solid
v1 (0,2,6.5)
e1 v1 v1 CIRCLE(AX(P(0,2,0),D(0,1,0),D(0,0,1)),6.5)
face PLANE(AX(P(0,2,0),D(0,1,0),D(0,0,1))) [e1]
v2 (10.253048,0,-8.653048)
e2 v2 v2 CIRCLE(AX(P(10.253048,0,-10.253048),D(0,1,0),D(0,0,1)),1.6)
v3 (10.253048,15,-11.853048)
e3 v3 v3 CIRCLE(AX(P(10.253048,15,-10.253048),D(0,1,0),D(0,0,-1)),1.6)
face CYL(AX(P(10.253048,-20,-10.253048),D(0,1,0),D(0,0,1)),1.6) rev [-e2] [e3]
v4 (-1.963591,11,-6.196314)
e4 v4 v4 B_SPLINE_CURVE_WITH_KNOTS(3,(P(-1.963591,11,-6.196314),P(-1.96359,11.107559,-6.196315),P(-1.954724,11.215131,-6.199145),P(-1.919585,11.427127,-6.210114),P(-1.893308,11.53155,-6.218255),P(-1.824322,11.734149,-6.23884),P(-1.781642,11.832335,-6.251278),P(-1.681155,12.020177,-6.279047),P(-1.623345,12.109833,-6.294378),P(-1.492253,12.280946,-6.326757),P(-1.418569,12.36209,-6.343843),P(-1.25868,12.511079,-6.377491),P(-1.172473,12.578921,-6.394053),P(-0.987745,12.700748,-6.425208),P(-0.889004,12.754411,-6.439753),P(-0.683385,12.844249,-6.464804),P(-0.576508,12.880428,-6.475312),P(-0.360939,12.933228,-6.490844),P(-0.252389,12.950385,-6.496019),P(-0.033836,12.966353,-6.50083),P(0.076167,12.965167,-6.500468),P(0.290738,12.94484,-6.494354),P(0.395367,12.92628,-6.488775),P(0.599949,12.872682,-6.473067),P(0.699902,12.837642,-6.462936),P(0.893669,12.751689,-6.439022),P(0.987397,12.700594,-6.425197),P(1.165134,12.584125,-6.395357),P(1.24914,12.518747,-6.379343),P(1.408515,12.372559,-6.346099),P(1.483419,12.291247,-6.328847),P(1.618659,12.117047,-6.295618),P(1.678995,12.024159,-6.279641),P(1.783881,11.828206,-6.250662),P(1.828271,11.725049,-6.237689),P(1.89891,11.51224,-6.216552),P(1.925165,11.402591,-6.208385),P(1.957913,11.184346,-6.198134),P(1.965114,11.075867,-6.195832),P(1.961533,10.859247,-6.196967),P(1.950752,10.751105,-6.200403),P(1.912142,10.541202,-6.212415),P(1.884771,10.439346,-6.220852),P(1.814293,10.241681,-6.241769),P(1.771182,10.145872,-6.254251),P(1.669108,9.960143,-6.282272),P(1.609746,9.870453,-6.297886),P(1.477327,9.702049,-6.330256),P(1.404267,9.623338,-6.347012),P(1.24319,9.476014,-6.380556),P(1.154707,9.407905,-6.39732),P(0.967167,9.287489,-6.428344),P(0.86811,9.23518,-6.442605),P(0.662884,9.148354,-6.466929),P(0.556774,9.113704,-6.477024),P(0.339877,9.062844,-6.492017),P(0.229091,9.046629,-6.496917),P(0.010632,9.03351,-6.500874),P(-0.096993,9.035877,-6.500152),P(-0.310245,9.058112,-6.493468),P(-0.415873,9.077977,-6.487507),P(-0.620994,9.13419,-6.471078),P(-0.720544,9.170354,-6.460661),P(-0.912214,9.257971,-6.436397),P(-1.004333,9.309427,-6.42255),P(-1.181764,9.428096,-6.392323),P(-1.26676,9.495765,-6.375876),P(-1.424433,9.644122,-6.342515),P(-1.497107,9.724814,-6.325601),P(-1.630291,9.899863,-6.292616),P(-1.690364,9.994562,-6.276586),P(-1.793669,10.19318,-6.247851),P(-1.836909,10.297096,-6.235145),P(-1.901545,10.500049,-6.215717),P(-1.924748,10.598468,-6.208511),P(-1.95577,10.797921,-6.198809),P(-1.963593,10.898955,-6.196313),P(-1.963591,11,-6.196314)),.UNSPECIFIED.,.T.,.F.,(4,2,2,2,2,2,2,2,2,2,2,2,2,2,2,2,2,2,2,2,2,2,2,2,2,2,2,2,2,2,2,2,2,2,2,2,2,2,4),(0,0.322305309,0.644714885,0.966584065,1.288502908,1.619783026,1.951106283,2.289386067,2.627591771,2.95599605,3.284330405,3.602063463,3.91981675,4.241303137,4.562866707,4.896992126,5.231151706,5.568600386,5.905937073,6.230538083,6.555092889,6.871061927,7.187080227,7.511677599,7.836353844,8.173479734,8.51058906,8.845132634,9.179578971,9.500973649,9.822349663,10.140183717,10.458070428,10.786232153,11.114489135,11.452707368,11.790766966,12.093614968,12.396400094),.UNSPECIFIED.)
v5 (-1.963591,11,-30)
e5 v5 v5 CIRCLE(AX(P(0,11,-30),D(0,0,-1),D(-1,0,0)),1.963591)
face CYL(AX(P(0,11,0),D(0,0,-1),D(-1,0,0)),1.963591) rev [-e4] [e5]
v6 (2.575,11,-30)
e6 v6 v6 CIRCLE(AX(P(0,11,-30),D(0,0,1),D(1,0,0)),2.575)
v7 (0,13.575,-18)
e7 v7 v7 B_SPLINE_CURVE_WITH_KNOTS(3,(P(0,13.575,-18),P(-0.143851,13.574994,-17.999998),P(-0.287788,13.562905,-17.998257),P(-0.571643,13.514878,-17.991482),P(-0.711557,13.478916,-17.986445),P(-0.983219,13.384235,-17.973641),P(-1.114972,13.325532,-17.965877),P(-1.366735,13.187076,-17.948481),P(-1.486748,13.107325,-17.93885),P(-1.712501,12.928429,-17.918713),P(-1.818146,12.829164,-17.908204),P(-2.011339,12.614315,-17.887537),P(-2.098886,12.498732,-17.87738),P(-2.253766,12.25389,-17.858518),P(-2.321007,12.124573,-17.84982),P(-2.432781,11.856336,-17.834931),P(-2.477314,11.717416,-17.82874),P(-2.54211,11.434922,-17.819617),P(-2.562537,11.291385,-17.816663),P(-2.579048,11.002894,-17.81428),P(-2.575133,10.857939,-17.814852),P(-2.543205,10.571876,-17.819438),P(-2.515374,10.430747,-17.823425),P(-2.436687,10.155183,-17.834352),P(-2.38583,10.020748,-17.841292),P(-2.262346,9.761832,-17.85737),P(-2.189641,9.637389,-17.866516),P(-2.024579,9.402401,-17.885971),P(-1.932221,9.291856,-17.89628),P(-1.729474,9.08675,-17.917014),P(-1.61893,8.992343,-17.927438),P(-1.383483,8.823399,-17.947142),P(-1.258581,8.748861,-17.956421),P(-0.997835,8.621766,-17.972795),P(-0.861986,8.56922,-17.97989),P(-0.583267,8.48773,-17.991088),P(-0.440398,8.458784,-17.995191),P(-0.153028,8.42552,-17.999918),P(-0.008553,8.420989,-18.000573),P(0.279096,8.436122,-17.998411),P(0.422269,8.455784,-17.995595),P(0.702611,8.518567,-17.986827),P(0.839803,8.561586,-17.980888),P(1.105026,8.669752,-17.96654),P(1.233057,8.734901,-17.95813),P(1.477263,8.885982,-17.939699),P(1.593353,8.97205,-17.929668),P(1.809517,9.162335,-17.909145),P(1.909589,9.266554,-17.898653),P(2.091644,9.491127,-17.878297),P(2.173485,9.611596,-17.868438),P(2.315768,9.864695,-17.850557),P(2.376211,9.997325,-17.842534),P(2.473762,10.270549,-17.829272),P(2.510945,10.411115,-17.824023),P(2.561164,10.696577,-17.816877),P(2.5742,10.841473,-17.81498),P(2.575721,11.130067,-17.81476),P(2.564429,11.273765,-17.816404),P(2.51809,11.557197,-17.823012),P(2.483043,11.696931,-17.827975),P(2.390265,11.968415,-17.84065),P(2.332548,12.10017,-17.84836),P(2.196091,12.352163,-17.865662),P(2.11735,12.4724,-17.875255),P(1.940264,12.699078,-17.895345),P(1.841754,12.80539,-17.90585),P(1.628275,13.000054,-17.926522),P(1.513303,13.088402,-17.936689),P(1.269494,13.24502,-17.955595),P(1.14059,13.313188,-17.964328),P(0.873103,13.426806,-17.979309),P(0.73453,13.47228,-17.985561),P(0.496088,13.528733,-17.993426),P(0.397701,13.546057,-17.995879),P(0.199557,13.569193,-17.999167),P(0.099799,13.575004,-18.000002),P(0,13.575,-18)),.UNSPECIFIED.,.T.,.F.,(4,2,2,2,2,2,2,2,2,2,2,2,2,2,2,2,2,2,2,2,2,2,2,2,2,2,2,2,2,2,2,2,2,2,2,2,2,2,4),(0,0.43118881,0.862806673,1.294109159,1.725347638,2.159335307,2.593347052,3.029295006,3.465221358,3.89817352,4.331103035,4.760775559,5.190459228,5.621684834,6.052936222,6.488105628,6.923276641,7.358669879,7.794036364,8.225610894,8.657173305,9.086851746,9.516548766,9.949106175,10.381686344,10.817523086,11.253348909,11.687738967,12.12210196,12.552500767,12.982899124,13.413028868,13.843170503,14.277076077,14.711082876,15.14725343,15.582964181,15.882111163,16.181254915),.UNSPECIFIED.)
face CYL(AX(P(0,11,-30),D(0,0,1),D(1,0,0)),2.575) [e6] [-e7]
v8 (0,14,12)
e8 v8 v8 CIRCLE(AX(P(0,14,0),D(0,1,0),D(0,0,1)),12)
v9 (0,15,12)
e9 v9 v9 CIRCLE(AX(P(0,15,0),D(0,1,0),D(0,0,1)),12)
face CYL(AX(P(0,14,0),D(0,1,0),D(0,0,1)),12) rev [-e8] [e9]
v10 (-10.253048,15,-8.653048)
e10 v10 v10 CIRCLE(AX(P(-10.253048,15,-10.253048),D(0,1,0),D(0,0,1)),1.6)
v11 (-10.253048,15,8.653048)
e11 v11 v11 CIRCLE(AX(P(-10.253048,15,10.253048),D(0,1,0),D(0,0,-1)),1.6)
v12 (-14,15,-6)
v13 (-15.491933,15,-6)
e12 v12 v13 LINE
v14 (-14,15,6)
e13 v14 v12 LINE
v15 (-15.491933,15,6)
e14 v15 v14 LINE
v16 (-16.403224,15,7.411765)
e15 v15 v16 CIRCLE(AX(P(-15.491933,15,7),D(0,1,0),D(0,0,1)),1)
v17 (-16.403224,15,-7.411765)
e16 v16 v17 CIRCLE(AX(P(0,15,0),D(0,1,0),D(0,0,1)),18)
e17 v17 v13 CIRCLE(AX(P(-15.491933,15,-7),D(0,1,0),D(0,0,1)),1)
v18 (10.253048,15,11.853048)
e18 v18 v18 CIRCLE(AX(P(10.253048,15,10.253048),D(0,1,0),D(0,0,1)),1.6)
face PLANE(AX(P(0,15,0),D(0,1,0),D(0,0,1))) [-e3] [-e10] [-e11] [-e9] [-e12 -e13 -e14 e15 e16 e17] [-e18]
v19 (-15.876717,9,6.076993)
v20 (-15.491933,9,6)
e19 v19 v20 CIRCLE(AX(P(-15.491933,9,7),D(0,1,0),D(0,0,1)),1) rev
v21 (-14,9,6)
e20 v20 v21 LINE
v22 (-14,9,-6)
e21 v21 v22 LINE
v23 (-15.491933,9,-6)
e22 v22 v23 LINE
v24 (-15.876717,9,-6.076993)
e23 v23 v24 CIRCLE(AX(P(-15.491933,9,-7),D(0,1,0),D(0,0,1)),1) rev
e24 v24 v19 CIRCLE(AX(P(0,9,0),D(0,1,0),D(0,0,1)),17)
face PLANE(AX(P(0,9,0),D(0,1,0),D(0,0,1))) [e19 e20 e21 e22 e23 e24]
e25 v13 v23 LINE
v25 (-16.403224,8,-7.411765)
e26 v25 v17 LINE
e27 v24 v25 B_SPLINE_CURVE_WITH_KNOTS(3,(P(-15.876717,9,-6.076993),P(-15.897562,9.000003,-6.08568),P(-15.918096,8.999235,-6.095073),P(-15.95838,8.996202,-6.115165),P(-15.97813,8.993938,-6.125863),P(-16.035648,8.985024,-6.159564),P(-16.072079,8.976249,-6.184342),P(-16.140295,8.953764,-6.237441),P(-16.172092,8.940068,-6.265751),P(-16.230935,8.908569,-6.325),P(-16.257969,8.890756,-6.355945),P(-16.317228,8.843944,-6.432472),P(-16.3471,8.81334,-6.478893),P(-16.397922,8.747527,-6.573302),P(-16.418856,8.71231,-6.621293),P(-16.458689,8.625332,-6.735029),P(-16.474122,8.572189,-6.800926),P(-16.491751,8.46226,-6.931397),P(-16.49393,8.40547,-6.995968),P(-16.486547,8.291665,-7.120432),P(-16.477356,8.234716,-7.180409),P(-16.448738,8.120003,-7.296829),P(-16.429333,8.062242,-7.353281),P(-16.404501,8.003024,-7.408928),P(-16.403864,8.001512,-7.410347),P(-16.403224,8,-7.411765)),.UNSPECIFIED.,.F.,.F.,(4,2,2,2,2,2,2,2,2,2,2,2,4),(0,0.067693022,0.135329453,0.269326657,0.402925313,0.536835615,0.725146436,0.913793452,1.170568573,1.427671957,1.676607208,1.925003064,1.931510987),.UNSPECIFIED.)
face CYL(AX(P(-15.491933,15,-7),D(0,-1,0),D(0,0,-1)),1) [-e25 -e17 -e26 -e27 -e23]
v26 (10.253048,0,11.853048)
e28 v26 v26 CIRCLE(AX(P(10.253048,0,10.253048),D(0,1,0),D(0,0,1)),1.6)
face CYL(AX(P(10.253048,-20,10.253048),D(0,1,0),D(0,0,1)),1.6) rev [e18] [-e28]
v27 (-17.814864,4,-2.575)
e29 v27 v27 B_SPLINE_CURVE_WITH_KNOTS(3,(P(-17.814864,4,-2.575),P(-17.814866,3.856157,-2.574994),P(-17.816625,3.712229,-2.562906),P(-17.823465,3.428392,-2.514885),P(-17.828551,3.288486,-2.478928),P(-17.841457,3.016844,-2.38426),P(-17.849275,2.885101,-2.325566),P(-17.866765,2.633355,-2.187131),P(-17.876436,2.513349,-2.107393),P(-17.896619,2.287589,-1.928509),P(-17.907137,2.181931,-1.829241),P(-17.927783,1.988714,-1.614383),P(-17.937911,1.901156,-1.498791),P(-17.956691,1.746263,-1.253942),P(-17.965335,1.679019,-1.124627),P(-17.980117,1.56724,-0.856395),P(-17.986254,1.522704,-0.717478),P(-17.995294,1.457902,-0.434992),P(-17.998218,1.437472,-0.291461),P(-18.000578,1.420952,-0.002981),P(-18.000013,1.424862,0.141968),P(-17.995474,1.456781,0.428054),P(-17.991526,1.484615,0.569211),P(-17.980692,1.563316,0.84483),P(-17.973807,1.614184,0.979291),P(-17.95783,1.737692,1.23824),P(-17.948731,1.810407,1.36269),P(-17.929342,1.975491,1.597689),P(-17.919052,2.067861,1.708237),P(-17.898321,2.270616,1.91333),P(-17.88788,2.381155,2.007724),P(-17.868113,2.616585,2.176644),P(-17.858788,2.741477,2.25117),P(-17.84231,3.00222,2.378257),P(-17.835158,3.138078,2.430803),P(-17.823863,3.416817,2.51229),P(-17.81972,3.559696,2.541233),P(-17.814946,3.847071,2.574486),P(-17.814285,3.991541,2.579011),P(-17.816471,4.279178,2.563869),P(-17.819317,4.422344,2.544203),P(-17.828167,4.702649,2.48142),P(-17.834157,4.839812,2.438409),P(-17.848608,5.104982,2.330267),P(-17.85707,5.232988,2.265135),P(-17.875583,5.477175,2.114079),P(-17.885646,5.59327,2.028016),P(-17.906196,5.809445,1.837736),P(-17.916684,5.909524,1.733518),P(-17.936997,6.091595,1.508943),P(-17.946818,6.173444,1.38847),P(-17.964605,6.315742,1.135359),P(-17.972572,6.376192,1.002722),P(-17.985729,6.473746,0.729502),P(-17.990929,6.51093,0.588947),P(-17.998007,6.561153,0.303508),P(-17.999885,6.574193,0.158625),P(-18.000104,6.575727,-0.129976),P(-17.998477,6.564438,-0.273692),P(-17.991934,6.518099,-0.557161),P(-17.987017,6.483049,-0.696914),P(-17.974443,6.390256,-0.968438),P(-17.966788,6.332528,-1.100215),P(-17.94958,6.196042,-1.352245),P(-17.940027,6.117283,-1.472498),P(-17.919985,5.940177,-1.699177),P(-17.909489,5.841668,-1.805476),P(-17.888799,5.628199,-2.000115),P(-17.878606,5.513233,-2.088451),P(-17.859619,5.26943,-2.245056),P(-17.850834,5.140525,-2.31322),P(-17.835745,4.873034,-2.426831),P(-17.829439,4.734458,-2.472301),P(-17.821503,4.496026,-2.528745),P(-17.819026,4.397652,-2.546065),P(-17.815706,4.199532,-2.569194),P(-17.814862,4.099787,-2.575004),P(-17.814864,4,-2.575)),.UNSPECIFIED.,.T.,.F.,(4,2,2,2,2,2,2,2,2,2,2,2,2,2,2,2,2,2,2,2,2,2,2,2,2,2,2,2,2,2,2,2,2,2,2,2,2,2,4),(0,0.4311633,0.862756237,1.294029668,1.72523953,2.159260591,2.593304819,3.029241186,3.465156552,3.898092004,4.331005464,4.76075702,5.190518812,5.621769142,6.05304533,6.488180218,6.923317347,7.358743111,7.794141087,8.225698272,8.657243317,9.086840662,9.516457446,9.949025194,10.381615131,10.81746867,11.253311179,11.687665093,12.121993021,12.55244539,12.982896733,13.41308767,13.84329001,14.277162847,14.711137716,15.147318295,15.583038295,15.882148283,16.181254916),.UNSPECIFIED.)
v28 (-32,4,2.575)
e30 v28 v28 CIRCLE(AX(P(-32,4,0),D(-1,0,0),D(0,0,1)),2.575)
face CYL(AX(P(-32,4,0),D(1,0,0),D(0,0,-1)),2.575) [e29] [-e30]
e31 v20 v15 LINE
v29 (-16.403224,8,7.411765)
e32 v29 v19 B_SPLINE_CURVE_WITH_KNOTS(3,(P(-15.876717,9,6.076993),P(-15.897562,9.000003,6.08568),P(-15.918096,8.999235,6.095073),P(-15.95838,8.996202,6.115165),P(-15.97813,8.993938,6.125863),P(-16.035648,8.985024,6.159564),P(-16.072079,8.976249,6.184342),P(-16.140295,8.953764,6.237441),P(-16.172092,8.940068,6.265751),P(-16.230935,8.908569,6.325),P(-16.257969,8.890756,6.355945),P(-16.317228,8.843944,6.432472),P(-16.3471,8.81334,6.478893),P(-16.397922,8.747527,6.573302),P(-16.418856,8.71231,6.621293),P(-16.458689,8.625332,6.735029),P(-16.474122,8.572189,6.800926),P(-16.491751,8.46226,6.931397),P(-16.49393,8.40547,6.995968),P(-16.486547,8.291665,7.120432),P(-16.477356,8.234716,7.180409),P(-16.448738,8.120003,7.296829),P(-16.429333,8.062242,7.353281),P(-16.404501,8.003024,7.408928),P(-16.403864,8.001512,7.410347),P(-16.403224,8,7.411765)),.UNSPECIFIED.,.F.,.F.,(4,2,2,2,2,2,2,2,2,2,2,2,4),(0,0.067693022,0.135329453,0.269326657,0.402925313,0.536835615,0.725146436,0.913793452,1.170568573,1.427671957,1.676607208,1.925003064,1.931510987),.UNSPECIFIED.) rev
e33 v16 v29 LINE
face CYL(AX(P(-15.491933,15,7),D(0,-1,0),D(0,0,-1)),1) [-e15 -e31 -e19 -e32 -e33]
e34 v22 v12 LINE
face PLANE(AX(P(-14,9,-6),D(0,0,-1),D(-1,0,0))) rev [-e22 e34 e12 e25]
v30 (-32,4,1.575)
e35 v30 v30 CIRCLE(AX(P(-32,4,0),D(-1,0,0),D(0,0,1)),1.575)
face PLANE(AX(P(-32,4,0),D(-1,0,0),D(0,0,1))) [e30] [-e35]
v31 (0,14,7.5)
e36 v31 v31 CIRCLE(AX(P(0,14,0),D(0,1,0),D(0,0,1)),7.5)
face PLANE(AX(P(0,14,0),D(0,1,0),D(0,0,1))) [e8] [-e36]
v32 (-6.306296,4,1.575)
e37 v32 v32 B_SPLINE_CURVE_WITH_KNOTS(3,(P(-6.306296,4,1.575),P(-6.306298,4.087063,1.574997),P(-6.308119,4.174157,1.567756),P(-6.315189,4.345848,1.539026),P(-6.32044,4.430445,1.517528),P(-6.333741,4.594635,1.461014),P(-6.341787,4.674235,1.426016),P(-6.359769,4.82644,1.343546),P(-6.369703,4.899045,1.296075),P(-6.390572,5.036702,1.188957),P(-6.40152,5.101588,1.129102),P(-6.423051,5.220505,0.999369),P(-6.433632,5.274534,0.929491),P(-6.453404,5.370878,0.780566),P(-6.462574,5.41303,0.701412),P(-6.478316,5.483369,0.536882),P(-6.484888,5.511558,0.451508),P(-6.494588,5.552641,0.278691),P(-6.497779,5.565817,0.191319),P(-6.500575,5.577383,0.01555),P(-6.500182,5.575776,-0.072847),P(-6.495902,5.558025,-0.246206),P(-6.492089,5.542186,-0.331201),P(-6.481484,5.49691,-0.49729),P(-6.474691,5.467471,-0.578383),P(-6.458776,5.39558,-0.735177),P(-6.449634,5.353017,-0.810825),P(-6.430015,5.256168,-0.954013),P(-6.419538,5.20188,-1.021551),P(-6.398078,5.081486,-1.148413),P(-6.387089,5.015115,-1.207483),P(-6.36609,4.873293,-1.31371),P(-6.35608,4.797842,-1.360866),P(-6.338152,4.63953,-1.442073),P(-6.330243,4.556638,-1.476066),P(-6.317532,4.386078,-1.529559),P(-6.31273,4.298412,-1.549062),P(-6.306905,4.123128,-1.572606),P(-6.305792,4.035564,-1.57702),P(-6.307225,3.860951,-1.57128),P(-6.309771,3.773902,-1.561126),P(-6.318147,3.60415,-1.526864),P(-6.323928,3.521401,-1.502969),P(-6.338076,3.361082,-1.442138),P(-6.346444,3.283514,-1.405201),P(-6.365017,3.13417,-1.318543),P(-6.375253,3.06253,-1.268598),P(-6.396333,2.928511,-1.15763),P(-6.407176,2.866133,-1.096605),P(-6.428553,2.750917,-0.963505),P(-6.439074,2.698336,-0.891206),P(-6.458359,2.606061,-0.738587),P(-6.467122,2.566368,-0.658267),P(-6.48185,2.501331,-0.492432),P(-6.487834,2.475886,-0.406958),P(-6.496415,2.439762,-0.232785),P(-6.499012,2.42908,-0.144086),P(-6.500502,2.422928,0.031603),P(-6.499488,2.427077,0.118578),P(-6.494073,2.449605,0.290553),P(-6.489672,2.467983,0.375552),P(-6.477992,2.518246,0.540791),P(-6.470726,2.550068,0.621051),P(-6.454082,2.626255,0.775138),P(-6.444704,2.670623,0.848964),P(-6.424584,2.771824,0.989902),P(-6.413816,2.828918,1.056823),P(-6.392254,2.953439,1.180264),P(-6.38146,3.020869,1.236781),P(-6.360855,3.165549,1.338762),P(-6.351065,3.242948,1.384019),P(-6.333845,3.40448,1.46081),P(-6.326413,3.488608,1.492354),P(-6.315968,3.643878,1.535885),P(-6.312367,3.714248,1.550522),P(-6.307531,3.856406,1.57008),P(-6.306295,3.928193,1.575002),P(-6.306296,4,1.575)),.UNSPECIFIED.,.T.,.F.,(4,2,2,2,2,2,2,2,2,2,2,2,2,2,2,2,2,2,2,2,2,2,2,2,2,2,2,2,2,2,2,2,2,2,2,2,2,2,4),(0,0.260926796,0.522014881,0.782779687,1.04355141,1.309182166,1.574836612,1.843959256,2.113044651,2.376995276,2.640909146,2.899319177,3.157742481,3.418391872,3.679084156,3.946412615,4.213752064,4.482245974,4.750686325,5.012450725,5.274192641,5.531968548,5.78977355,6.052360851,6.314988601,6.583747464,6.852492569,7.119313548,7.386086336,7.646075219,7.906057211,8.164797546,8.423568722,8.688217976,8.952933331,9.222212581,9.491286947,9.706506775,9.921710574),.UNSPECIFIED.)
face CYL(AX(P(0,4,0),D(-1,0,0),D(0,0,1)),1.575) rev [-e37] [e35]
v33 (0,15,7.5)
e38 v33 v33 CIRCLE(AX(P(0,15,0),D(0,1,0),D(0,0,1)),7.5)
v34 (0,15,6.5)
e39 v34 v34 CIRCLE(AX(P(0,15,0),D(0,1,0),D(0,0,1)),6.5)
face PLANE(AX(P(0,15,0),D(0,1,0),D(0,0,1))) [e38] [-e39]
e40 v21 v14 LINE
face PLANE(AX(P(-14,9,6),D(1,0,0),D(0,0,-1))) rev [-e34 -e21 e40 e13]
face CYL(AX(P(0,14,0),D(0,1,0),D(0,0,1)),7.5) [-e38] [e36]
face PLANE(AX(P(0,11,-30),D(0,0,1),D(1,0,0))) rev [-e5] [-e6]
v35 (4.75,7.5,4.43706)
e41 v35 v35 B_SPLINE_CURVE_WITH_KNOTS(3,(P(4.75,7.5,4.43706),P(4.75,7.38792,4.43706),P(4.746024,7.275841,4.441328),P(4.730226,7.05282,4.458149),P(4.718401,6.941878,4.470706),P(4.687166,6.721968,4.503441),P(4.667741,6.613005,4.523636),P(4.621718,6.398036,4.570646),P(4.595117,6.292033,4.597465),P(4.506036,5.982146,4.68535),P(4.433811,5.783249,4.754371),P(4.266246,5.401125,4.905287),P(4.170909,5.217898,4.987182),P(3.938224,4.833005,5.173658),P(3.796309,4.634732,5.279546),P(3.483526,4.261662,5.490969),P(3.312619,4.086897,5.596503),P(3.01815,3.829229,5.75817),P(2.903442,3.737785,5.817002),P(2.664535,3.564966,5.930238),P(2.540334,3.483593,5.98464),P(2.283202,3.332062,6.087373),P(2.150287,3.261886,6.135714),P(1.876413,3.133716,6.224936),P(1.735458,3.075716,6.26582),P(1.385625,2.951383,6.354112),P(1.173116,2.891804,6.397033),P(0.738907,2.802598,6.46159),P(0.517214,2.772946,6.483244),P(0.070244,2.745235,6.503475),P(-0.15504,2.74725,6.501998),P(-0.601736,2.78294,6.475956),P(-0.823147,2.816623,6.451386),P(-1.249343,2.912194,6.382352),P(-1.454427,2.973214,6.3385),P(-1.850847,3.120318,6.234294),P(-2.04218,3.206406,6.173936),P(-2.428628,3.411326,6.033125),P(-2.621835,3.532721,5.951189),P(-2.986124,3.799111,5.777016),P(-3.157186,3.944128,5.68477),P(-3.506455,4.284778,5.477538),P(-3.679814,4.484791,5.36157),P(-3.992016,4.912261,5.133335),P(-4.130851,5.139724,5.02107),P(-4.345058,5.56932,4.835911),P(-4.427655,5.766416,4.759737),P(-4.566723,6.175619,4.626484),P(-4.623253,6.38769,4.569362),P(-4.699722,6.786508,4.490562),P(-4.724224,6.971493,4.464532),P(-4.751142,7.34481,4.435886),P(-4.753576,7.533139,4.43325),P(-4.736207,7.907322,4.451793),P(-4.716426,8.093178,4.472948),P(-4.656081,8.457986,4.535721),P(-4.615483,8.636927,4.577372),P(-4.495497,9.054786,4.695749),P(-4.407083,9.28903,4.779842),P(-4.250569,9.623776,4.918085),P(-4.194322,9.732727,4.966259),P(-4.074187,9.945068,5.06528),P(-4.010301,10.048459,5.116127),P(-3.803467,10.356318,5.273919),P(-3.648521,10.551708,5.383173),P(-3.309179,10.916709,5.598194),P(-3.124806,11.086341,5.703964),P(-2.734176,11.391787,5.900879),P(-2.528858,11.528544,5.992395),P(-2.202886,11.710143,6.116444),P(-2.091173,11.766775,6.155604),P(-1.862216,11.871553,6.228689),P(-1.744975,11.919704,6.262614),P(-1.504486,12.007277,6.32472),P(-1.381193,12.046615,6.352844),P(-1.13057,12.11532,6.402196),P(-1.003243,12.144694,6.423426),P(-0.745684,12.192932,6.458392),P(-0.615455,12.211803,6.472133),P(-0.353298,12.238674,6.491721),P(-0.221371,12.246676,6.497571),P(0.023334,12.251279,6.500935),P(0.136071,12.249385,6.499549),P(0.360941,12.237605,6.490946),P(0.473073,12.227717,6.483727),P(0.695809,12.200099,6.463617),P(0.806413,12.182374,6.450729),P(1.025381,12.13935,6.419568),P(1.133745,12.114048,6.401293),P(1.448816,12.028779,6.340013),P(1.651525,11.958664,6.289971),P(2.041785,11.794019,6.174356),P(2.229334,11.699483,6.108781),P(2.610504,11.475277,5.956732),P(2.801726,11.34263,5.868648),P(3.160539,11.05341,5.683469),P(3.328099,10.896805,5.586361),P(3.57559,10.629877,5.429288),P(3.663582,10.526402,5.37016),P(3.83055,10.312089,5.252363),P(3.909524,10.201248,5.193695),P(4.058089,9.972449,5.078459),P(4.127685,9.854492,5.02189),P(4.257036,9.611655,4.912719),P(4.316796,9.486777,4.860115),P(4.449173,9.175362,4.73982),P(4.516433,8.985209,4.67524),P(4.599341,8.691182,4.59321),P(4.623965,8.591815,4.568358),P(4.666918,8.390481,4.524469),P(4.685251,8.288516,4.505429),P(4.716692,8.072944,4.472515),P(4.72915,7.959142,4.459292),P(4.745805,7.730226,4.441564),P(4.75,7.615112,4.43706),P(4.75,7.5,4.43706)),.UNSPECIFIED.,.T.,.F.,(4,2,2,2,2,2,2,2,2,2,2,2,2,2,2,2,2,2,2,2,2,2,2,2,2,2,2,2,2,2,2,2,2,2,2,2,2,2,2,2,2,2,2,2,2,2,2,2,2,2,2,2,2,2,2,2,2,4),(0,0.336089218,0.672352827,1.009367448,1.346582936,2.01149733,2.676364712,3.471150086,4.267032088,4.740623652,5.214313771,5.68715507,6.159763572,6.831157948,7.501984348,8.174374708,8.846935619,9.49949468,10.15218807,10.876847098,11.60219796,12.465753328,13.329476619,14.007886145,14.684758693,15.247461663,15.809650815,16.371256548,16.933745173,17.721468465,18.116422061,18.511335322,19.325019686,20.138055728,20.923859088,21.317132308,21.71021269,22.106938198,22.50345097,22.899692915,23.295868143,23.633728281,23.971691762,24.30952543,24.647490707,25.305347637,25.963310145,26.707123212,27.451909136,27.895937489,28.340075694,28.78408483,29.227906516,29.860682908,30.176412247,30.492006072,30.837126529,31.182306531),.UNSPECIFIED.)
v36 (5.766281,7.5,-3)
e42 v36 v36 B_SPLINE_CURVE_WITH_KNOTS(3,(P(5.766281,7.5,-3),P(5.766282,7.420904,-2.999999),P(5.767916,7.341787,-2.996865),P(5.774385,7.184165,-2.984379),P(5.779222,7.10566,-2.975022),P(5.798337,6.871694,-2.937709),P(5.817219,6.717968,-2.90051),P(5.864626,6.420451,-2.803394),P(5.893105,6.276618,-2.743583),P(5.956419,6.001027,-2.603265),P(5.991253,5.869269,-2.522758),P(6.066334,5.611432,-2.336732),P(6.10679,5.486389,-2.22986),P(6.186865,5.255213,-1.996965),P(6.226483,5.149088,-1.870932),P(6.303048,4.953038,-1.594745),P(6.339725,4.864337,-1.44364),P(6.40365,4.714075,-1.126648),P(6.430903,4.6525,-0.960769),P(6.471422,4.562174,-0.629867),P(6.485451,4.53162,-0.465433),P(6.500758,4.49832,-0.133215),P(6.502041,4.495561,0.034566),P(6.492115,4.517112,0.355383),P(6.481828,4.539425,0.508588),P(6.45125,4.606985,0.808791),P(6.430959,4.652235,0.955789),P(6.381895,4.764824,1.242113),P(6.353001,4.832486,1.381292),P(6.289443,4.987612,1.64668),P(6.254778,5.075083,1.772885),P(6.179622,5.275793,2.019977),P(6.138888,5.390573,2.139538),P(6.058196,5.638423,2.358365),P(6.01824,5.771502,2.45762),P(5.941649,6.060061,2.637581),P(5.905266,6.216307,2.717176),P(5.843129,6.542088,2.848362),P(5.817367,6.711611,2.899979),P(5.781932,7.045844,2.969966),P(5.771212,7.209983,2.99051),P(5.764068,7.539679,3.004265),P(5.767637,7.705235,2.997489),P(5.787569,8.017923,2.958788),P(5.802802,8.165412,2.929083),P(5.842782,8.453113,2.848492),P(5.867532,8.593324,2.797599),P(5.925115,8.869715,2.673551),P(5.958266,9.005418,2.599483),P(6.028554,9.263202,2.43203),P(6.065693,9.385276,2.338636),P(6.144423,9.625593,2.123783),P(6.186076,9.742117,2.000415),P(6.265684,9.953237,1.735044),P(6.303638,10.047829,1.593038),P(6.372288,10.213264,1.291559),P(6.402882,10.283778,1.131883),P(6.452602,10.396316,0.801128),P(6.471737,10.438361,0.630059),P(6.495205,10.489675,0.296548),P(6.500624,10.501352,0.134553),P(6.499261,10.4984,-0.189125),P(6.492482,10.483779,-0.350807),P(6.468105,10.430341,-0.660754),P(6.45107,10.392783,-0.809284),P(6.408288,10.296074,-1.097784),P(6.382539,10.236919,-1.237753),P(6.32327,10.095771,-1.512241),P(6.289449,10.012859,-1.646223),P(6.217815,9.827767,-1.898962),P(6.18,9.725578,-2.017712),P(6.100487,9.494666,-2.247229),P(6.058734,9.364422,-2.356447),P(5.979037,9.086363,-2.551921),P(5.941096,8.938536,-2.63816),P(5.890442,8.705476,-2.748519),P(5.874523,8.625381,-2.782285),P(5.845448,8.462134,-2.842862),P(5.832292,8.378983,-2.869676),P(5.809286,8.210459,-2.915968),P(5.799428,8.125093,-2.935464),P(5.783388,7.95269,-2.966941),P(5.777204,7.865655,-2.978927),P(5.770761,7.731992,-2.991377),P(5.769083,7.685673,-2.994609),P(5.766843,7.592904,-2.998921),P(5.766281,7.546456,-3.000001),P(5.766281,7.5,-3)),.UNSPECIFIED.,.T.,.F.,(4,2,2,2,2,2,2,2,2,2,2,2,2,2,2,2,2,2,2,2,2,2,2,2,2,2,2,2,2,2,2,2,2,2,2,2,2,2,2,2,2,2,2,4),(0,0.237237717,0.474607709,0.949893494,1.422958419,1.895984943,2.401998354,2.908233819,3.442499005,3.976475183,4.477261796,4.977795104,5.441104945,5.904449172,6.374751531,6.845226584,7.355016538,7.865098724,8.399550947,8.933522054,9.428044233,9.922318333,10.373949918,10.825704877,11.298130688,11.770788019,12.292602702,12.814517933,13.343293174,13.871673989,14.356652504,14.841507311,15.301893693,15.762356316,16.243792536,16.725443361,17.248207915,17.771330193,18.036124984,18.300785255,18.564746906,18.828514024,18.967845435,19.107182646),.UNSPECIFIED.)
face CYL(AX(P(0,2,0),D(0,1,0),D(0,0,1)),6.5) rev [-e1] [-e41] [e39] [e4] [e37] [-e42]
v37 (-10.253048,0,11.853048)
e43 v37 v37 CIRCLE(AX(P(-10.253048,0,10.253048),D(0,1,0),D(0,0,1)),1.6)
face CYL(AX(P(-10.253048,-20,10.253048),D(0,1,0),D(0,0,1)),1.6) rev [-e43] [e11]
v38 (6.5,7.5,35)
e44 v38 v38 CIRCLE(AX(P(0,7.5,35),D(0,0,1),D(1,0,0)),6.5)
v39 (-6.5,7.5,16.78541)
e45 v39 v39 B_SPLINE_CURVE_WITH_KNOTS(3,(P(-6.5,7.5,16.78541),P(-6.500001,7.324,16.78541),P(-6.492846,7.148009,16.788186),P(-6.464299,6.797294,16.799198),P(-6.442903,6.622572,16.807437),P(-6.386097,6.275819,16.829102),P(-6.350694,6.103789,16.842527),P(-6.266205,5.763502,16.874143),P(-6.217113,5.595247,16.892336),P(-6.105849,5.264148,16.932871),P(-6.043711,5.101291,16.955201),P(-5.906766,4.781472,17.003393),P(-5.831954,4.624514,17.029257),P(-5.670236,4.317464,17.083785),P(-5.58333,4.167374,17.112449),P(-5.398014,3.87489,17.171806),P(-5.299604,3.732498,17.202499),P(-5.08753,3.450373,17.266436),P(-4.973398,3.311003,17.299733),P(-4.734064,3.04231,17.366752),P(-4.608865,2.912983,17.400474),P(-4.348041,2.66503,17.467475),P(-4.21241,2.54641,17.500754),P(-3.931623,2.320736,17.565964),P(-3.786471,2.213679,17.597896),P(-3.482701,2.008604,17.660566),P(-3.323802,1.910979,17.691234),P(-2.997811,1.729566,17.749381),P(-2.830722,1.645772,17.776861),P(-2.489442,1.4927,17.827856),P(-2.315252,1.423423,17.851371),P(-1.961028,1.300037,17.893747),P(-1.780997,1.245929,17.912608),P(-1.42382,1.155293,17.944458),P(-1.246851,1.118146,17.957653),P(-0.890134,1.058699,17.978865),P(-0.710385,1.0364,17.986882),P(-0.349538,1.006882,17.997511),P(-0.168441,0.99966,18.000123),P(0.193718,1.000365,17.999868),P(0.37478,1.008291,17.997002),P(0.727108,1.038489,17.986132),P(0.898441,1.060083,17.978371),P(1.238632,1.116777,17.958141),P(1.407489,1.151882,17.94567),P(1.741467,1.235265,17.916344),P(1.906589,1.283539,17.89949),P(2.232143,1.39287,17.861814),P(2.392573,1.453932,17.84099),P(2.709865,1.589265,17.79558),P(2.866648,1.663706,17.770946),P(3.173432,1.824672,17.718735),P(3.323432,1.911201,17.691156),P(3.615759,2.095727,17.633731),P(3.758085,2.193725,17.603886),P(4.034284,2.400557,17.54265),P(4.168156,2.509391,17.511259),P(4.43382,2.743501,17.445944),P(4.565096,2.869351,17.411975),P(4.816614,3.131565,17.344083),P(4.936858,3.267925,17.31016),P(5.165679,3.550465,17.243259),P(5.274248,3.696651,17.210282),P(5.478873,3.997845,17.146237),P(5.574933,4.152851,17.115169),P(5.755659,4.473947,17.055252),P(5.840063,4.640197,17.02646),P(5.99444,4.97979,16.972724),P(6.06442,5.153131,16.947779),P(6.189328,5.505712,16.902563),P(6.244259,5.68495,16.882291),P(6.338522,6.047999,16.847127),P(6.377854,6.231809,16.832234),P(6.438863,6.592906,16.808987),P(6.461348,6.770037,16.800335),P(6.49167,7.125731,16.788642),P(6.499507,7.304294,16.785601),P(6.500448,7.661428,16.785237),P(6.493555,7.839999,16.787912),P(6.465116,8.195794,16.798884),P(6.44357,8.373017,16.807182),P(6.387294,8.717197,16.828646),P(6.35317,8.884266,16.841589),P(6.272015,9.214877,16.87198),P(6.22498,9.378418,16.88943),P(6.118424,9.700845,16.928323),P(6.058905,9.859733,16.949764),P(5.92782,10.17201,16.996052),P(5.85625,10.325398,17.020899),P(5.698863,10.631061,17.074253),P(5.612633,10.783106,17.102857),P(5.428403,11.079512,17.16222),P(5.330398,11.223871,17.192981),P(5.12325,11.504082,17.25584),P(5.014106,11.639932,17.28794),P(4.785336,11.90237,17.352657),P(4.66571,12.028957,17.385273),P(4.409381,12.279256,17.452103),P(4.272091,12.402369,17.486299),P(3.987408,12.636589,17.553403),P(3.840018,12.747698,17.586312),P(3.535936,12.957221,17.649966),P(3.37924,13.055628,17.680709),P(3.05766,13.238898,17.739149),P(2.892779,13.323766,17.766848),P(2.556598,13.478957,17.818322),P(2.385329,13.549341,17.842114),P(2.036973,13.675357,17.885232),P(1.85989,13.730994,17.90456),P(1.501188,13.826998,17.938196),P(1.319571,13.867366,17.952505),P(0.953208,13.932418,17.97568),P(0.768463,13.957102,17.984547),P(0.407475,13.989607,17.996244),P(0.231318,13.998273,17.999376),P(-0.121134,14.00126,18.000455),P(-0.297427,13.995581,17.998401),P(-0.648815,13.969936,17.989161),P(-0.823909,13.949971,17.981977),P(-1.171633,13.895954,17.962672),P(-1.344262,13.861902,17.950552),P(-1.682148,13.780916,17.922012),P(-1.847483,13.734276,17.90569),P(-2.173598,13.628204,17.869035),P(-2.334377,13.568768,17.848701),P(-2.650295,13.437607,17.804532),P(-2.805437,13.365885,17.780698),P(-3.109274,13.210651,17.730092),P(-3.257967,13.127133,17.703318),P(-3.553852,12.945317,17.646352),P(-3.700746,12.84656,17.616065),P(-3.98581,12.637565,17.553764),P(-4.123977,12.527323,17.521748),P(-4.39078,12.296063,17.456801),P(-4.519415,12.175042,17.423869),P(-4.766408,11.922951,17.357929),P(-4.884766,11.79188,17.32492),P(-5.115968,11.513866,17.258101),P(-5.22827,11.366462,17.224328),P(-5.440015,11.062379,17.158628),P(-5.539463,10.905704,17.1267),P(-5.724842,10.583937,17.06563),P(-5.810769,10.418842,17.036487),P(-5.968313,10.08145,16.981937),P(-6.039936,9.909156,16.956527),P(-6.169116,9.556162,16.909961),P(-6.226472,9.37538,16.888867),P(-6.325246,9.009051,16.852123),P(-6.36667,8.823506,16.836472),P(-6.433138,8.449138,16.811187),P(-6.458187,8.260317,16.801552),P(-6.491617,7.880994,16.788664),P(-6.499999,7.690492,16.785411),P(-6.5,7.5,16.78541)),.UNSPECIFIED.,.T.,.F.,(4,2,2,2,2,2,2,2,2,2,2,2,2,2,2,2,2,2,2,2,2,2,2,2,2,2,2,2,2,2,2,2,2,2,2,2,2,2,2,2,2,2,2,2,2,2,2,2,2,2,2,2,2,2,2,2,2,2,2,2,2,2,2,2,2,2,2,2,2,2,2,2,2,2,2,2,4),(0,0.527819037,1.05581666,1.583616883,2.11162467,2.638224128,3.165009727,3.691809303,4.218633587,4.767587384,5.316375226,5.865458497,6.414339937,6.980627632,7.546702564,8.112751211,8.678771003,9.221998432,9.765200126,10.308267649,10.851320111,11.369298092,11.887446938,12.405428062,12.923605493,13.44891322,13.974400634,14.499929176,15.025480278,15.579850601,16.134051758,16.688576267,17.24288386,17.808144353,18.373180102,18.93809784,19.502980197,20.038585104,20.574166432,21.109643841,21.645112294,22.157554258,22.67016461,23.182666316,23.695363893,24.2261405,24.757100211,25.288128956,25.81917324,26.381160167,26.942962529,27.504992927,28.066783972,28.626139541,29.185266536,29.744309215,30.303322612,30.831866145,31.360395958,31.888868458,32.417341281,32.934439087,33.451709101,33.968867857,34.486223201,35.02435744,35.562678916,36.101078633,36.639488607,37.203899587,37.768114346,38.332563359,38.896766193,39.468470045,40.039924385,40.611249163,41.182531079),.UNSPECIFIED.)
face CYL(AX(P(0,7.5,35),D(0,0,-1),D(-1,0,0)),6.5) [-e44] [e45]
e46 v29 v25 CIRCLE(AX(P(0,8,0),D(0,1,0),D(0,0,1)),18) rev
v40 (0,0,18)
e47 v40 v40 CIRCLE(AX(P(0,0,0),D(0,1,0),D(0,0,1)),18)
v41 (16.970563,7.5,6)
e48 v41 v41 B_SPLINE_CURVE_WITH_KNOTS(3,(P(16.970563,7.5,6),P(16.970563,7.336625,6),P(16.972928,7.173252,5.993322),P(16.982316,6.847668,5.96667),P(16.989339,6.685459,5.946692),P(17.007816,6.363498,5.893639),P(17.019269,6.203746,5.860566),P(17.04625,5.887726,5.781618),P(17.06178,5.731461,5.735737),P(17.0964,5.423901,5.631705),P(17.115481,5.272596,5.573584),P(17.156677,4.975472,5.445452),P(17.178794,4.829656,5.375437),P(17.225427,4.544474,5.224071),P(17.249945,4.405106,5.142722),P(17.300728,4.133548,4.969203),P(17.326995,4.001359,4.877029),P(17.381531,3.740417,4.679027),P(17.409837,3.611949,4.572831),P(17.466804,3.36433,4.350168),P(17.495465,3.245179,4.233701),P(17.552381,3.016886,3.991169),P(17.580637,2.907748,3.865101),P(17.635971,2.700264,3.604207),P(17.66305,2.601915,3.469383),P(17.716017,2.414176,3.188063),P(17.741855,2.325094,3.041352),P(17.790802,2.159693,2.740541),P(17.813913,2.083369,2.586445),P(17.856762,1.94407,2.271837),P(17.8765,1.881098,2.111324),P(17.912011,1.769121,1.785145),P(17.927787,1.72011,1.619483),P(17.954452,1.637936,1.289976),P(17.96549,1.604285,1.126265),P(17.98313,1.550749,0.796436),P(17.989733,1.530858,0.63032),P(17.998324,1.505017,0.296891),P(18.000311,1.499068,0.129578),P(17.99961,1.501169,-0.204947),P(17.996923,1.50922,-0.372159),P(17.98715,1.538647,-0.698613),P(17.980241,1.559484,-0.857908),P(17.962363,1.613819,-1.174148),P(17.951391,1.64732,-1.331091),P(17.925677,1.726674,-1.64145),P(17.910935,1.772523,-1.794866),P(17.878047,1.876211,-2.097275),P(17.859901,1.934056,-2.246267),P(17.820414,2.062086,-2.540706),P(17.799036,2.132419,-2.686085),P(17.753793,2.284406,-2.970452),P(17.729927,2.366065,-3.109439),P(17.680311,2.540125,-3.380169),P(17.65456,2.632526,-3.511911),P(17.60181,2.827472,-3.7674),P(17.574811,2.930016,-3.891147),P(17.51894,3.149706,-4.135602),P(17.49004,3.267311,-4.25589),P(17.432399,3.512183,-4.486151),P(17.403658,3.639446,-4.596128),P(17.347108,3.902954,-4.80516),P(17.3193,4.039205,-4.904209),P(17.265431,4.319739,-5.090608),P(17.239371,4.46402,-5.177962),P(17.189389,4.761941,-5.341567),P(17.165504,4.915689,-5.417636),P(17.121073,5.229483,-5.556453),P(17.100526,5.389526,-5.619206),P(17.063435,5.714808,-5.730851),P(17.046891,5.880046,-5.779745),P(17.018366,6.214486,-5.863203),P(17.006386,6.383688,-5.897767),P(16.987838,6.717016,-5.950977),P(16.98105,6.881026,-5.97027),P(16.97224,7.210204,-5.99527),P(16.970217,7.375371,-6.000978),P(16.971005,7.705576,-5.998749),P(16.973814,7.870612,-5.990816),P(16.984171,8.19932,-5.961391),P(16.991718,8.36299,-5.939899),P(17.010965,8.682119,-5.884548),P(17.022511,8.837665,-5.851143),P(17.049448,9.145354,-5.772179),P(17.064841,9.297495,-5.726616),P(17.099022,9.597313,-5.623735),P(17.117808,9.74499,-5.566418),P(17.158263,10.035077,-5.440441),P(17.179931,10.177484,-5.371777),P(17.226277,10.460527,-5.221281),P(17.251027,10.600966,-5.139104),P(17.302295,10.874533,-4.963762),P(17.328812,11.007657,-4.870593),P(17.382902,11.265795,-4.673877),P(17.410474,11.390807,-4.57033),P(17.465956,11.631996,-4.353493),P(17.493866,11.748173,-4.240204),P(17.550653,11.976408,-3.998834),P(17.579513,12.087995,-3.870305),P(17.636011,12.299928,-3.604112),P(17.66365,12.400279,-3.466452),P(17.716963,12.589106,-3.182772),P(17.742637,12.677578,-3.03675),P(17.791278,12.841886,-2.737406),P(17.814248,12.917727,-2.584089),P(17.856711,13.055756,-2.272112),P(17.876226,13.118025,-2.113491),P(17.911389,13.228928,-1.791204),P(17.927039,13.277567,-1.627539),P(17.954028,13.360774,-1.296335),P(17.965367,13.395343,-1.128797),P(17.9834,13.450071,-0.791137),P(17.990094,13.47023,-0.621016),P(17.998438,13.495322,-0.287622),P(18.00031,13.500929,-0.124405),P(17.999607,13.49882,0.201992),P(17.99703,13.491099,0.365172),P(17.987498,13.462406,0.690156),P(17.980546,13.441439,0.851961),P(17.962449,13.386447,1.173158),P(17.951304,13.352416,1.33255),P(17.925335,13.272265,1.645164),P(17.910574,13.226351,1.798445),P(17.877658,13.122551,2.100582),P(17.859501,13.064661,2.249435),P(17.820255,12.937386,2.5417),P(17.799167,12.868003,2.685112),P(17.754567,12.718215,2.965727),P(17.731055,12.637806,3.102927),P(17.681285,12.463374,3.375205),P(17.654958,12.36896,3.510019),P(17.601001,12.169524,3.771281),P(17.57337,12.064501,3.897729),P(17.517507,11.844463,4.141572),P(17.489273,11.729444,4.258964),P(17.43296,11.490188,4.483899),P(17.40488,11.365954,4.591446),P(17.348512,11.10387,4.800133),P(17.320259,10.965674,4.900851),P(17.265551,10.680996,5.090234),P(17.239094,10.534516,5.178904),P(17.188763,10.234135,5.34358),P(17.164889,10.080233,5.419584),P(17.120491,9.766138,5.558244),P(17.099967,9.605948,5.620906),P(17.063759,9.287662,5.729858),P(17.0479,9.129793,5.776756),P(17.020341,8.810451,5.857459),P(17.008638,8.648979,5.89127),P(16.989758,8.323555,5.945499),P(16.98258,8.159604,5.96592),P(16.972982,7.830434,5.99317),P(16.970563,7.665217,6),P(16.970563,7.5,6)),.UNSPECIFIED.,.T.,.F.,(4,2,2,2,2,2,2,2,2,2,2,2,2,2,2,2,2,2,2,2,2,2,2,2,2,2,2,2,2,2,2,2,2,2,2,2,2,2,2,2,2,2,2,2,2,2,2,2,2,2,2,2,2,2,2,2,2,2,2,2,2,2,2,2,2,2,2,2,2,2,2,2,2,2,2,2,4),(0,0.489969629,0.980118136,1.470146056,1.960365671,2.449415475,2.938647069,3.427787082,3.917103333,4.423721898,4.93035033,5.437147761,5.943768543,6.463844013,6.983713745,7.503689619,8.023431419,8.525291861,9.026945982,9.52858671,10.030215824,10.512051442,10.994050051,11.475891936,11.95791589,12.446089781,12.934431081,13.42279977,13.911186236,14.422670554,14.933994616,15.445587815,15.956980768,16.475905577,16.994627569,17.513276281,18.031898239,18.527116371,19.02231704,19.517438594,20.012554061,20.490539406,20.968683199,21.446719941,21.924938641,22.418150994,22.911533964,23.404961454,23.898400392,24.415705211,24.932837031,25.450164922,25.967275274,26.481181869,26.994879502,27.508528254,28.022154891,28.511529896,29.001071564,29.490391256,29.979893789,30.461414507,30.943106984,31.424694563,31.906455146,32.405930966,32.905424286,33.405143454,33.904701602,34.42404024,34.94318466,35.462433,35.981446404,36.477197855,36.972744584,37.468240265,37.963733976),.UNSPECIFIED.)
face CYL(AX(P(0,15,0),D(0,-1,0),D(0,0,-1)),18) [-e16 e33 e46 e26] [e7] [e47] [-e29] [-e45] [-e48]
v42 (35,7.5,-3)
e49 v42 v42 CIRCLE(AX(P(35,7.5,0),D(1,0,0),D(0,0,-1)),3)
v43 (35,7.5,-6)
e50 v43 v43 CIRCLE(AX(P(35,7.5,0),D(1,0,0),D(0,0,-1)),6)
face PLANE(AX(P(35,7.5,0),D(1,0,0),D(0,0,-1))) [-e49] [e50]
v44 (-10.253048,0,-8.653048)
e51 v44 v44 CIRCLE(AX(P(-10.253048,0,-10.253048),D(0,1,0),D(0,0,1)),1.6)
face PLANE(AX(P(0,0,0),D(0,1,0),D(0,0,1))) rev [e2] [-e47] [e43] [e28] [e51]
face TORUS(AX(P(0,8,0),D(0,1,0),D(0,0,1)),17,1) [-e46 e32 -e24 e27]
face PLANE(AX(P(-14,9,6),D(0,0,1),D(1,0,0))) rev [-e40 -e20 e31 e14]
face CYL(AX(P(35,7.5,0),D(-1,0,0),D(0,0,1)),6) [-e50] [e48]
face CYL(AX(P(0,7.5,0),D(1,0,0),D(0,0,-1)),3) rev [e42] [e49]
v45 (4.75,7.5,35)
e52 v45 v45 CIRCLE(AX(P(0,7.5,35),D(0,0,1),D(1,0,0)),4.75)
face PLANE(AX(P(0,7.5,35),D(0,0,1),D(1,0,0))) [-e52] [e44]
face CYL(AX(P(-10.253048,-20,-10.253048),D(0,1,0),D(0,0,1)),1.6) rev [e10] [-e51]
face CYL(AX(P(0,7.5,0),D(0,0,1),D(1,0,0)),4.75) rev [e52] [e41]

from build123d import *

# Parameters (mm, degrees)
SKETCH1_R         = 18
BODY_DEPTH        = 15
SKETCH2_R         = 12
SKETCH2_R_2       = 7.5
GASKET_DEPTH      = 1
SKETCH6_R         = 6
CE_PORT_DEPTH     = 35
SKETCH8_W         = 8
SKETCH8_H         = 12
SPE_DEPTH         = 6
SPE_FILLET_R      = 1
SKETCH9_R         = 6.5
RE_PORT_DEPTH     = 35
SKETCH10_R        = 4.75
RE_HOLE_DEPTH     = 35
SKETCH7_R         = 3
CE_HOLE_DEPTH     = 35
SKETCH11_R        = 1.6
BOLTS_DEPTH       = 35
SKETCH13_R        = 2.575
OUTLET_DEPTH      = 30
SKETCH4_R         = 6.5
CELL_VOL_DEPTH    = 13
OUTLET_H_R        = 1.963591437
OUTLET_HOLE_DEPTH = 30
SKETCH15_R        = 2.575
INLET_DEPTH       = 18
SKETCH16_R        = 1.575
INLET_HOLE_DEPTH  = 32


with BuildPart() as part:
    # Sketch1 → Body (new body)
    with BuildSketch(Plane(origin=(0, 0, 0), x_dir=(1, 0, 0), z_dir=(0, 1, 0))):
        with Locations(Location((0, 0, 0), (0, 0, 270))):
            Circle(SKETCH1_R)
    extrude(amount=BODY_DEPTH)

    # Sketch2 → Gasket (cut)
    with BuildSketch(Plane(origin=(0, 15, 0), x_dir=(1, 0, 0), z_dir=(0, 1, 0))):
        with Locations(Location((0, 0, 0), (0, 0, 270))):
            Circle(SKETCH2_R)
        with Locations(Location((0, 0, 0), (0, 0, 270))):
            Circle(SKETCH2_R_2, mode=Mode.SUBTRACT)
    extrude(amount=-GASKET_DEPTH, mode=Mode.SUBTRACT)

    # Sketch6 → CE_port (add)
    with BuildSketch(Plane(origin=(0, 0, 0), x_dir=(0, 0, -1), z_dir=(1, 0, 0))):
        with Locations(Location((0, 7.5, 0), (0, 0, 180))):
            Circle(SKETCH6_R)
    extrude(amount=CE_PORT_DEPTH)

    # Sketch8 → SPE (cut)
    with BuildSketch(Plane(origin=(0, 15, 0), x_dir=(1, 0, 0), z_dir=(0, 1, 0))):
        with Locations((-18, 0)):
            Rectangle(SKETCH8_W, SKETCH8_H)
    extrude(amount=-SPE_DEPTH, mode=Mode.SUBTRACT)

    # SPE_Fillet
    # the kernel refuses this fillet: 1 mm, written as the material it takes off along each edge
    with BuildSketch(Plane(origin=(0, 9, 0), x_dir=(-0.8875777915854841, 0, 0.4606578598962953), z_dir=(0.4606578598962953, 0, 0.8875777915854841))) as spe_fillet_piece_1_section:
        with BuildLine():
            CenterArc((18 - SPE_FILLET_R, SPE_FILLET_R), SPE_FILLET_R, 270, 90)
            Line((18 - SPE_FILLET_R, 0), (18, 0))
            Line((18, 0), (18, SPE_FILLET_R))
        make_face()
    spe_fillet_piece_1 = revolve(axis=Axis((0, 9, 0), (0, -1, 0)), revolution_arc=54.859132299, mode=Mode.PRIVATE)
    spe_fillet_piece_1 = split(spe_fillet_piece_1, bisect_by=Plane(origin=(-17.717440744, 8.717440744, 6), z_dir=(0, 0, -1)), keep=Keep.TOP, mode=Mode.PRIVATE)
    spe_fillet_piece_1 = split(spe_fillet_piece_1, bisect_by=Plane(origin=(-17.717440744, 8.717440744, -6), z_dir=(0, 0, 1)), keep=Keep.TOP, mode=Mode.PRIVATE)
    add(spe_fillet_piece_1, mode=Mode.SUBTRACT)
    with BuildSketch(Plane(origin=(-16.970562748, 18.803742657, -6), x_dir=(0.3728821950274604, 0, -0.9278786928427136), z_dir=(0, -1, 0))) as spe_fillet_piece_2:
        with BuildLine():
            CenterArc((1.479233256, 0.999106486), SPE_FILLET_R, 158.106520097, 114.315739171)
            Line((0.551354563, 1.371988681), (0, 0))
            ThreePointArc((0, 0), (0.760748531, -0.01608325), (1.521497063, 0))
        make_face()
    extrude(amount=9.803742657, mode=Mode.SUBTRACT)
    with BuildSketch(Plane(origin=(-16.970562748, 18.803742657, 6), x_dir=(0.37288219502746, 0, 0.9278786928427138), z_dir=(0, -1, 0))) as spe_fillet_piece_3:
        with BuildLine():
            CenterArc((1.479233256, -0.999106486), SPE_FILLET_R, 87.577740732, 114.315739171)
            Line((0.551354563, -1.371988681), (0, 0))
            ThreePointArc((0, 0), (0.760748531, 0.01608325), (1.521497063, 0))
        make_face()
    extrude(amount=9.803742657, mode=Mode.SUBTRACT)
    with BuildSketch(Plane(origin=(-16.970562748, 18.803742657, 6), x_dir=(0.37288219502746, 0, 0.9278786928427138), z_dir=(0, -1, 0))) as spe_fillet_piece_4a_section:
        with BuildLine():
            CenterArc((1.479233256, -0.999106486), SPE_FILLET_R, 87.577740732, 114.315739171)
            Line((0.551354563, -1.371988681), (0, 0))
            ThreePointArc((0, 0), (0.760748531, 0.01608325), (1.521497063, 0))
        make_face()
    spe_fillet_piece_4a = extrude(amount=13.607485314, mode=Mode.PRIVATE)
    spe_fillet_piece_4a = split(spe_fillet_piece_4a, bisect_by=Plane(origin=(-16.491409341, 9, 6.340012755), z_dir=(0, -1, 0)), keep=Keep.TOP, mode=Mode.PRIVATE)
    with BuildSketch(Plane(origin=(0, 9, 0), x_dir=(-0.8875777915854841, 0, 0.4606578598962953), z_dir=(0.4606578598962953, 0, 0.8875777915854841))) as spe_fillet_piece_4b_section:
        with BuildLine():
            CenterArc((18 - SPE_FILLET_R, SPE_FILLET_R), SPE_FILLET_R, 270, 90)
            Line((18 - SPE_FILLET_R, 0), (18, 0))
            Line((18, 0), (18, SPE_FILLET_R))
        make_face()
    spe_fillet_piece_4b = revolve(axis=Axis((0, 9, 0), (0, -1, 0)), revolution_arc=54.859132299, mode=Mode.PRIVATE)
    spe_fillet_piece_4b = split(spe_fillet_piece_4b, bisect_by=Plane(origin=(-16.286739391, 8.767935426, 6), z_dir=(0, 0, 1)), keep=Keep.TOP, mode=Mode.PRIVATE)
    spe_fillet_piece_4 = spe_fillet_piece_4a & spe_fillet_piece_4b
    add(spe_fillet_piece_4, mode=Mode.SUBTRACT)
    with BuildSketch(Plane(origin=(0, 9, 0), x_dir=(-0.8875777915854841, 0, 0.4606578598962953), z_dir=(0.4606578598962953, 0, 0.8875777915854841))) as spe_fillet_piece_5a_section:
        with BuildLine():
            CenterArc((18 - SPE_FILLET_R, SPE_FILLET_R), SPE_FILLET_R, 270, 90)
            Line((18 - SPE_FILLET_R, 0), (18, 0))
            Line((18, 0), (18, SPE_FILLET_R))
        make_face()
    spe_fillet_piece_5a = revolve(axis=Axis((0, 9, 0), (0, -1, 0)), revolution_arc=54.859132299, mode=Mode.PRIVATE)
    spe_fillet_piece_5a = split(spe_fillet_piece_5a, bisect_by=Plane(origin=(-16.286739653, 8.767935416, -6), z_dir=(0, 0, -1)), keep=Keep.TOP, mode=Mode.PRIVATE)
    with BuildSketch(Plane(origin=(-16.970562748, 18.803742657, -6), x_dir=(0.3728821950274604, 0, -0.9278786928427136), z_dir=(0, -1, 0))) as spe_fillet_piece_5b_section:
        with BuildLine():
            CenterArc((1.479233256, 0.999106486), SPE_FILLET_R, 158.106520097, 114.315739171)
            Line((0.551354563, 1.371988681), (0, 0))
            ThreePointArc((0, 0), (0.760748531, -0.01608325), (1.521497063, 0))
        make_face()
    spe_fillet_piece_5b = extrude(amount=13.607485314, mode=Mode.PRIVATE)
    spe_fillet_piece_5b = split(spe_fillet_piece_5b, bisect_by=Plane(origin=(-16.491409341, 9, -6.340012755), z_dir=(0, -1, 0)), keep=Keep.TOP, mode=Mode.PRIVATE)
    spe_fillet_piece_5 = spe_fillet_piece_5a & spe_fillet_piece_5b
    add(spe_fillet_piece_5, mode=Mode.SUBTRACT)

    # Sketch9 → RE_port (add)
    with BuildSketch(Plane.XY):
        with Locations(Location((0, 7.5, 0), (0, 0, 180))):
            Circle(SKETCH9_R)
    extrude(amount=RE_PORT_DEPTH)

    # Sketch10 → RE_hole (cut)
    with BuildSketch(Plane.XY.offset(35)):
        with Locations((0, 7.5)):
            Circle(SKETCH10_R)
    extrude(amount=-RE_HOLE_DEPTH, mode=Mode.SUBTRACT)

    # Sketch7 → CE_hole (cut)
    with BuildSketch(Plane(origin=(35, 0, 0), x_dir=(0, 0, -1), z_dir=(1, 0, 0))):
        with Locations((0, 7.5)):
            Circle(SKETCH7_R)
    extrude(amount=-CE_HOLE_DEPTH, mode=Mode.SUBTRACT)

    # Sketch11 → Bolts (cut)
    with BuildSketch(Plane(origin=(0, 15, 0), x_dir=(1, 0, 0), z_dir=(0, 1, 0))):
        with Locations(Location((-10.253048327, 10.253048327, 0), (0, 0, 270))):
            Circle(SKETCH11_R)
        with Locations(Location((10.253048327, 10.253048327, 0), (0, 0, 270))):
            Circle(SKETCH11_R)
        with Locations(Location((10.253048327, -10.253048327, 0), (0, 0, 270))):
            Circle(SKETCH11_R)
        with Locations(Location((-10.253048327, -10.253048327, 0), (0, 0, 270))):
            Circle(SKETCH11_R)
    extrude(amount=-BOLTS_DEPTH, mode=Mode.SUBTRACT)

    # Sketch13 → Outlet (add)
    with BuildSketch(Plane.XY):
        with Locations((0, 11)):
            Circle(SKETCH13_R)
    extrude(amount=-OUTLET_DEPTH)

    # Sketch4 → Cell_vol (cut)
    with BuildSketch(Plane(origin=(0, 15, 0), x_dir=(1, 0, 0), z_dir=(0, 1, 0))):
        with Locations(Location((0, 0, 0), (0, 0, 270))):
            Circle(SKETCH4_R)
    extrude(amount=-CELL_VOL_DEPTH, mode=Mode.SUBTRACT)

    # Outlet_h → Outlet_hole (cut)
    with BuildSketch(Plane(origin=(0, 0, -30), x_dir=(-1, 0, 0), z_dir=(0, 0, -1))):
        with Locations((0, 11)):
            Circle(OUTLET_H_R)
    extrude(amount=-OUTLET_HOLE_DEPTH, mode=Mode.SUBTRACT)

    # Sketch15 → Inlet (add)
    with BuildSketch(Plane.ZY.offset(14)):
        with Locations(Location((0, 4, 0), (0, 0, 180))):
            Circle(SKETCH15_R)
    extrude(amount=INLET_DEPTH)

    # Sketch16 → Inlet_hole (cut)
    with BuildSketch(Plane.ZY.offset(32)):
        with Locations((0, 4)):
            Circle(SKETCH16_R)
    extrude(amount=-INLET_HOLE_DEPTH, mode=Mode.SUBTRACT)


solid = part.part
